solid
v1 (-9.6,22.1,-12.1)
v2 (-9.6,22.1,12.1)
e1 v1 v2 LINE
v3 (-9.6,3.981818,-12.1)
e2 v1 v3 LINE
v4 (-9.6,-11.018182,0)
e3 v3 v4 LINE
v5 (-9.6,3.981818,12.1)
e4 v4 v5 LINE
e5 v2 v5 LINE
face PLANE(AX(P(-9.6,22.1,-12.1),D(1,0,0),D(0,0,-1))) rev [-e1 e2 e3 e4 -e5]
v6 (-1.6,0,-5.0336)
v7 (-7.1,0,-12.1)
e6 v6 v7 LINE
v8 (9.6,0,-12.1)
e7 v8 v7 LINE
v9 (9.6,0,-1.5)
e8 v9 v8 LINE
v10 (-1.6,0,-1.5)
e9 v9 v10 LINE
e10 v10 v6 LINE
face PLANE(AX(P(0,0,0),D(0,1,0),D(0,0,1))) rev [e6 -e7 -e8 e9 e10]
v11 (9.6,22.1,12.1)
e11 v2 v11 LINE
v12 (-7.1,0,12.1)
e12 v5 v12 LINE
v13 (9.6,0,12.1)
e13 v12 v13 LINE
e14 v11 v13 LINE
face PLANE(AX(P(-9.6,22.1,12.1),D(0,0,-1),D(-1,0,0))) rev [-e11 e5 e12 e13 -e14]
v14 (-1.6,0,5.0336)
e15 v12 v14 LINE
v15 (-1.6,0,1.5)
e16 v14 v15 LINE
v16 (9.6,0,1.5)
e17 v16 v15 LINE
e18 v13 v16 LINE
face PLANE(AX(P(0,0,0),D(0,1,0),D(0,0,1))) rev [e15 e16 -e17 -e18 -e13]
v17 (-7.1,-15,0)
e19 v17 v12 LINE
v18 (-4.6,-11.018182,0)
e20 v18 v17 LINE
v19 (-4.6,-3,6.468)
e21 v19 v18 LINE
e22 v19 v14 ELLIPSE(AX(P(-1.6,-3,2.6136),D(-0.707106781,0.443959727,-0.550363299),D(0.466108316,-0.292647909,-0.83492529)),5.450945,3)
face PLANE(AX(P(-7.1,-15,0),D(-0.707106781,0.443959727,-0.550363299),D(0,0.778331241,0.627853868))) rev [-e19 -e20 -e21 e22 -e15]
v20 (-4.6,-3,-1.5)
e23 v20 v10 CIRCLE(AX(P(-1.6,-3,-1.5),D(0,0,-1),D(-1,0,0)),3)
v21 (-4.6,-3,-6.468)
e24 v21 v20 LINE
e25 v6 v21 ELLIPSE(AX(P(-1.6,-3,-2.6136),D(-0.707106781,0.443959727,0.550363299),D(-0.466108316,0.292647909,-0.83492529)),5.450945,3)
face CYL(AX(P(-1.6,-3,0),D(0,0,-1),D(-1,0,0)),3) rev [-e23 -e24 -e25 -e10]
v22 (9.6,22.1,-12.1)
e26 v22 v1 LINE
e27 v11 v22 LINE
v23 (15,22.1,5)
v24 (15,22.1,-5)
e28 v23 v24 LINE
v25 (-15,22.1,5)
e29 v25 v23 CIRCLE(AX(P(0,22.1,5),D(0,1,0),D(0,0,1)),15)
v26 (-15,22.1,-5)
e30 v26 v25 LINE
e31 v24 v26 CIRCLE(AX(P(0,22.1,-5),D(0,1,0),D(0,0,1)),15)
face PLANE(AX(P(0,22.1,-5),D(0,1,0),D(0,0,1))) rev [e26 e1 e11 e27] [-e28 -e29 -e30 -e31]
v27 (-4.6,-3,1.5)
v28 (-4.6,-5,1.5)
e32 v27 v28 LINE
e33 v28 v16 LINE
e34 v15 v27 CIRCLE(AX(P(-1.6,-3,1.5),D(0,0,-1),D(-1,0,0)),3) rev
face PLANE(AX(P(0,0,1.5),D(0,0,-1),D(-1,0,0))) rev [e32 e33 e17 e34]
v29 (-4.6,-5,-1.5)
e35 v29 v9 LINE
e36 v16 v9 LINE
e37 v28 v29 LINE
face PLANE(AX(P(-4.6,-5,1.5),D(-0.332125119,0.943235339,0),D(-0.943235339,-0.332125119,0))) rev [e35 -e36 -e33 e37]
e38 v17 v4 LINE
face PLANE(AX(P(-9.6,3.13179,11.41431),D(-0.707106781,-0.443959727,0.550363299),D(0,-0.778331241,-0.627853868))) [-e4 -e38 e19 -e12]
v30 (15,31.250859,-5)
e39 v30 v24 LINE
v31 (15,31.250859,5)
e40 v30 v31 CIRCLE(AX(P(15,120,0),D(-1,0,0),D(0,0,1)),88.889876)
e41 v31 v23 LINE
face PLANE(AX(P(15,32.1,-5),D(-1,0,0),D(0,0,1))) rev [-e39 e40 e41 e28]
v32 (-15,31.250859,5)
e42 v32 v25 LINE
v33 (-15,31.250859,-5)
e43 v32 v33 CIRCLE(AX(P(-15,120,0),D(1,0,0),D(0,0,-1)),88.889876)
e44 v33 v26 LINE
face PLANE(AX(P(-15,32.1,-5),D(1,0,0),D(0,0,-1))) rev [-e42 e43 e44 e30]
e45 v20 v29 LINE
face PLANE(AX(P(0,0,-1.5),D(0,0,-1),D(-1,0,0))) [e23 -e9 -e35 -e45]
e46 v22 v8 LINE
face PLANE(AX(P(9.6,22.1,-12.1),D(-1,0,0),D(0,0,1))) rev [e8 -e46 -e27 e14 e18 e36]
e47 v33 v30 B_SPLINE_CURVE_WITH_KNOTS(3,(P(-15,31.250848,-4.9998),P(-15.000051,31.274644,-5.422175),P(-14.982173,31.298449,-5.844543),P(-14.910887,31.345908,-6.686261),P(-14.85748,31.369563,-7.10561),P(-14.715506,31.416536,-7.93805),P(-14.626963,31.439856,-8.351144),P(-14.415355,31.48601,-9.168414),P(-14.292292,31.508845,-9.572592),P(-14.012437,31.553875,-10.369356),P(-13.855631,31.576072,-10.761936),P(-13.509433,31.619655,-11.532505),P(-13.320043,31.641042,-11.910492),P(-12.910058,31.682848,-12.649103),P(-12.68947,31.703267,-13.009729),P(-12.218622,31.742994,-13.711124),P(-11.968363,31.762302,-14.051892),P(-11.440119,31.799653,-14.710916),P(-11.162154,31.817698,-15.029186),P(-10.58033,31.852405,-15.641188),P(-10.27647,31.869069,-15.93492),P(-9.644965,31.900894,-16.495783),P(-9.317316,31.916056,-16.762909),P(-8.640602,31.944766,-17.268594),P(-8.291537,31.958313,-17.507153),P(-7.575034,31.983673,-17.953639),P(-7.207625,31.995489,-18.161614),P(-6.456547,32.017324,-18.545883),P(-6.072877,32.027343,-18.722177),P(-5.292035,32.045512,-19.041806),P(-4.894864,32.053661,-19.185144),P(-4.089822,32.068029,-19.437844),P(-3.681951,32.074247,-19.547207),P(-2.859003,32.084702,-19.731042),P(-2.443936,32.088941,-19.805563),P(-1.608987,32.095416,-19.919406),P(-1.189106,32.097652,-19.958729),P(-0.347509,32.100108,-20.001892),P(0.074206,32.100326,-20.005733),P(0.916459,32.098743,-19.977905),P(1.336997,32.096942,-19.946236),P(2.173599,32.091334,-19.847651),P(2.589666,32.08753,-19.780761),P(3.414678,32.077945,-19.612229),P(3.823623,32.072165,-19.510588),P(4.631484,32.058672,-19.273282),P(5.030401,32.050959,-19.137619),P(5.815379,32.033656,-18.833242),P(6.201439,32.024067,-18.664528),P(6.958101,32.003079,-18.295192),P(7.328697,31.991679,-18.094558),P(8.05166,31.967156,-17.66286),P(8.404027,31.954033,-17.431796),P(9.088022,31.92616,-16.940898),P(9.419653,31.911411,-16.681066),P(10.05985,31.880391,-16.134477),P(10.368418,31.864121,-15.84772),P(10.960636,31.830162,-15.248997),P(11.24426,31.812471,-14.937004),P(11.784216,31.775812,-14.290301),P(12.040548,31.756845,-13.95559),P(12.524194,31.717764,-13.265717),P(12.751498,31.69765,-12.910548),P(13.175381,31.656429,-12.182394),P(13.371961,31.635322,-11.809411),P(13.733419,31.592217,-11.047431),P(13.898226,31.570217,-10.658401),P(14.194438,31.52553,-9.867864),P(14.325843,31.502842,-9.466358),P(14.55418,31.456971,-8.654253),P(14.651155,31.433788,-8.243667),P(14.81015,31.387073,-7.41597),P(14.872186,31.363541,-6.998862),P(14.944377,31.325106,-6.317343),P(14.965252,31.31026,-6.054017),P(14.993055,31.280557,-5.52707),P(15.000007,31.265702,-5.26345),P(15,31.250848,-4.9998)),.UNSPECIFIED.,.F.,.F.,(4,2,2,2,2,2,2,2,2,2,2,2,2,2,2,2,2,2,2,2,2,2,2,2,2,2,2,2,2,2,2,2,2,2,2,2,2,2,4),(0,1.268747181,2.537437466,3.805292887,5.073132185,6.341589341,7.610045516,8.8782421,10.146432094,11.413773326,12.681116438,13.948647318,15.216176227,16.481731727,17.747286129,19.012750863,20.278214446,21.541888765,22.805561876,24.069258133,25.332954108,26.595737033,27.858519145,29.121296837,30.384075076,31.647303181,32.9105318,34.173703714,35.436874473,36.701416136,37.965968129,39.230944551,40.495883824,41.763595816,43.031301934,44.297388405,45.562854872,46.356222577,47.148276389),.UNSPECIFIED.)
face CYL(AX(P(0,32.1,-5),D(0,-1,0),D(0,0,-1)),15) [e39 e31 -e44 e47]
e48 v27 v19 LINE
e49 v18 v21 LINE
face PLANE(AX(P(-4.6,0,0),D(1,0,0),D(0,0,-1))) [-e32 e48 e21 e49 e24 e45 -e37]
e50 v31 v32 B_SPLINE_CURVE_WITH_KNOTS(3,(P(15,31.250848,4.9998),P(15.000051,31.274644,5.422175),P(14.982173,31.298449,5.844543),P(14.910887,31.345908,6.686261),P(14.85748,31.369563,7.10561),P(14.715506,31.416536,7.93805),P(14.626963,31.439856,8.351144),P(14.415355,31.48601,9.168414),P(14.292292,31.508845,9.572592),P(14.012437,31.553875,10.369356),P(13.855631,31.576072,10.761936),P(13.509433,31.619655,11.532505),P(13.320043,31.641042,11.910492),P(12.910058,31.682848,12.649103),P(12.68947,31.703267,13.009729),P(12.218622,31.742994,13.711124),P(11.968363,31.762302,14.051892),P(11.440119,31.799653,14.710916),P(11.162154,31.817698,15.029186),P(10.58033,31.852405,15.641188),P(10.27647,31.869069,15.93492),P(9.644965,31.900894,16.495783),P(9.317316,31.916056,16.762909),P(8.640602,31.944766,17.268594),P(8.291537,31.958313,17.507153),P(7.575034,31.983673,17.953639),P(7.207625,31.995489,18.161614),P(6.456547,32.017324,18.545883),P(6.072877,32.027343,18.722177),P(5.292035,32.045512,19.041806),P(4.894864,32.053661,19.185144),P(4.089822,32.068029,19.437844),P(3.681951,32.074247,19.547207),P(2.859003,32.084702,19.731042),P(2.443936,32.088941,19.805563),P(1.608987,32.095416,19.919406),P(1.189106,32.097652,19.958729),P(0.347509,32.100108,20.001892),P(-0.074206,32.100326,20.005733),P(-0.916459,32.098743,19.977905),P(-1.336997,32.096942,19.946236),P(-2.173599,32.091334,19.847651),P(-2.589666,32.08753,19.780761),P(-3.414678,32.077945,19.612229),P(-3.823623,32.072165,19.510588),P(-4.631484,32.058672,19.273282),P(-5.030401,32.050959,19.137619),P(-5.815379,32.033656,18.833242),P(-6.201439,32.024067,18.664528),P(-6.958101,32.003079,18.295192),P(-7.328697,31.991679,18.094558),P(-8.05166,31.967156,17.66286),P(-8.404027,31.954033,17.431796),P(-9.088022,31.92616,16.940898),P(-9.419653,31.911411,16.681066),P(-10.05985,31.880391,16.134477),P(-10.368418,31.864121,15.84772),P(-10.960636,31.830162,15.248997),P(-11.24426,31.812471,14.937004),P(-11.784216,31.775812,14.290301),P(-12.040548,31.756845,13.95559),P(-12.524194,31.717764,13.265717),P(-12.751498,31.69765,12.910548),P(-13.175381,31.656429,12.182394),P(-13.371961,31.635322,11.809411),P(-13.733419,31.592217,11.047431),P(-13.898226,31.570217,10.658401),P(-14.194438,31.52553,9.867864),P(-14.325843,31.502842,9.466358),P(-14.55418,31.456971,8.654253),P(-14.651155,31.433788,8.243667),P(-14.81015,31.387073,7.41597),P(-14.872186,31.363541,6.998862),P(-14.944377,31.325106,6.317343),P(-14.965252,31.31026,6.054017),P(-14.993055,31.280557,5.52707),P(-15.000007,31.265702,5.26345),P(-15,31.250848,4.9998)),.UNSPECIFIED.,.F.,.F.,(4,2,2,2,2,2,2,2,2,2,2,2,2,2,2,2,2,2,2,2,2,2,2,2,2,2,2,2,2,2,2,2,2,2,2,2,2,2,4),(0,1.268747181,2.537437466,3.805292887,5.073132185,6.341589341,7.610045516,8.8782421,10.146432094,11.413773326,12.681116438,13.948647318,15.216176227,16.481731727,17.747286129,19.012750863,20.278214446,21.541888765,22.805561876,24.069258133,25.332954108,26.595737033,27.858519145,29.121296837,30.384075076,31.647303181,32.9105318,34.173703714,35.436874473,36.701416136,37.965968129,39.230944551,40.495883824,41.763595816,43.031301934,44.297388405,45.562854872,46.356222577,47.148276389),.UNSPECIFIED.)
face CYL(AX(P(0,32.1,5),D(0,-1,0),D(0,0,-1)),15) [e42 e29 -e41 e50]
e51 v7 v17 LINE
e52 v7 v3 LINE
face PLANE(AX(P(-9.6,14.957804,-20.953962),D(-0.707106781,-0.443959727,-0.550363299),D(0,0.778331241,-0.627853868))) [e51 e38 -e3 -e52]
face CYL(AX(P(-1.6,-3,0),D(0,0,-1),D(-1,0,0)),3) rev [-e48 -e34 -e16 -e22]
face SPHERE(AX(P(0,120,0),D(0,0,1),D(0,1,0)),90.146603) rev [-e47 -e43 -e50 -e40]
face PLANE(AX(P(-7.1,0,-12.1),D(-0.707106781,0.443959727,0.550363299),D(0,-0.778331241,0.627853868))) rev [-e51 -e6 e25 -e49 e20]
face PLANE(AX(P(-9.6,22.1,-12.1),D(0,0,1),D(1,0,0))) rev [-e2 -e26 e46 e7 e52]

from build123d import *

# Parameters (mm, degrees)
SKETCH1_W           = 19.2
SKETCH1_H           = 24.2
BOSS_EXTRUDE1_DEPTH = 22.1
BOSS_EXTRUDE2_DEPTH = 10
BOSS_EXTRUDE3_DEPTH = 5
BOSS_EXTRUDE4_DEPTH = 1.5
CHAMFER1_SIZE       = 2.5
FILLET1_R           = 3


with BuildPart() as part:
    # Sketch1 → Boss-Extrude1 (new body)
    with BuildSketch(Plane(origin=(0, 0, 0), x_dir=(1, 0, 0), z_dir=(0, 1, 0))):
        Rectangle(SKETCH1_W, SKETCH1_H)
    extrude(amount=BOSS_EXTRUDE1_DEPTH)

    # Sketch2 → Boss-Extrude2 (add)
    with BuildSketch(Plane(origin=(0, 22.1, 0), x_dir=(1, 0, 0), z_dir=(0, 1, 0))):
        with BuildLine():
            Line((15, 5), (15, -5))
            ThreePointArc((15, -5), (0, -20), (-15, -5))
            Line((-15, -5), (-15, 5))
            ThreePointArc((-15, 5), (0, 20), (15, 5))
        make_face()
    extrude(amount=BOSS_EXTRUDE2_DEPTH)

    # Sketch4 → Boss-Extrude3 (add)
    with BuildSketch(Plane.ZY.offset(9.6)):
        Polygon((-12.1, 0), (0, -15), (12.1, 0), align=None)
    extrude(amount=-BOSS_EXTRUDE3_DEPTH)

    # Sketch6 → Boss-Extrude4 (add, symmetric)
    with BuildSketch(Plane.XY):
        Polygon((-4.6, -5), (9.6, 0), (-4.6, 0), align=None)
    extrude(amount=BOSS_EXTRUDE4_DEPTH, both=True)

    # Chamfer1
    chamfer1_edges = [part.edges().sort_by_distance(p)[0] for p in [
        (-9.6, -7.5, -6.05),
        (-4.6, -7.5, -6.05),
        (-9.6, -7.5, 6.05),
        (-4.6, -7.5, 6.05),
    ]]
    chamfer(chamfer1_edges, length=CHAMFER1_SIZE - 0.0001)  # a hair under: the kernel refuses the full size

    # Fillet1
    fillet1_edges = [part.edges().sort_by_distance(p)[0] for p in [
        (-4.6, 0, -5.194064205),
        (-4.6, 0, 5.194064205),
    ]]
    fillet(fillet1_edges, radius=FILLET1_R)

    # Sketch8 → Cut-Revolve3 (revolve, cut)
    with BuildSketch(Plane(origin=(0, 0, 0), x_dir=(0, 0, -1), z_dir=(1, 0, 0))):
        with BuildLine():
            Line((-90.14660282, 120), (90.14660282, 120))
            ThreePointArc((90.14660282, 120), (0, 29.85339718), (-90.14660282, 120))
        make_face()
    revolve(axis=Axis((0, 120, 90.14660282), (0, 0, -1)), mode=Mode.SUBTRACT)


solid = part.part
